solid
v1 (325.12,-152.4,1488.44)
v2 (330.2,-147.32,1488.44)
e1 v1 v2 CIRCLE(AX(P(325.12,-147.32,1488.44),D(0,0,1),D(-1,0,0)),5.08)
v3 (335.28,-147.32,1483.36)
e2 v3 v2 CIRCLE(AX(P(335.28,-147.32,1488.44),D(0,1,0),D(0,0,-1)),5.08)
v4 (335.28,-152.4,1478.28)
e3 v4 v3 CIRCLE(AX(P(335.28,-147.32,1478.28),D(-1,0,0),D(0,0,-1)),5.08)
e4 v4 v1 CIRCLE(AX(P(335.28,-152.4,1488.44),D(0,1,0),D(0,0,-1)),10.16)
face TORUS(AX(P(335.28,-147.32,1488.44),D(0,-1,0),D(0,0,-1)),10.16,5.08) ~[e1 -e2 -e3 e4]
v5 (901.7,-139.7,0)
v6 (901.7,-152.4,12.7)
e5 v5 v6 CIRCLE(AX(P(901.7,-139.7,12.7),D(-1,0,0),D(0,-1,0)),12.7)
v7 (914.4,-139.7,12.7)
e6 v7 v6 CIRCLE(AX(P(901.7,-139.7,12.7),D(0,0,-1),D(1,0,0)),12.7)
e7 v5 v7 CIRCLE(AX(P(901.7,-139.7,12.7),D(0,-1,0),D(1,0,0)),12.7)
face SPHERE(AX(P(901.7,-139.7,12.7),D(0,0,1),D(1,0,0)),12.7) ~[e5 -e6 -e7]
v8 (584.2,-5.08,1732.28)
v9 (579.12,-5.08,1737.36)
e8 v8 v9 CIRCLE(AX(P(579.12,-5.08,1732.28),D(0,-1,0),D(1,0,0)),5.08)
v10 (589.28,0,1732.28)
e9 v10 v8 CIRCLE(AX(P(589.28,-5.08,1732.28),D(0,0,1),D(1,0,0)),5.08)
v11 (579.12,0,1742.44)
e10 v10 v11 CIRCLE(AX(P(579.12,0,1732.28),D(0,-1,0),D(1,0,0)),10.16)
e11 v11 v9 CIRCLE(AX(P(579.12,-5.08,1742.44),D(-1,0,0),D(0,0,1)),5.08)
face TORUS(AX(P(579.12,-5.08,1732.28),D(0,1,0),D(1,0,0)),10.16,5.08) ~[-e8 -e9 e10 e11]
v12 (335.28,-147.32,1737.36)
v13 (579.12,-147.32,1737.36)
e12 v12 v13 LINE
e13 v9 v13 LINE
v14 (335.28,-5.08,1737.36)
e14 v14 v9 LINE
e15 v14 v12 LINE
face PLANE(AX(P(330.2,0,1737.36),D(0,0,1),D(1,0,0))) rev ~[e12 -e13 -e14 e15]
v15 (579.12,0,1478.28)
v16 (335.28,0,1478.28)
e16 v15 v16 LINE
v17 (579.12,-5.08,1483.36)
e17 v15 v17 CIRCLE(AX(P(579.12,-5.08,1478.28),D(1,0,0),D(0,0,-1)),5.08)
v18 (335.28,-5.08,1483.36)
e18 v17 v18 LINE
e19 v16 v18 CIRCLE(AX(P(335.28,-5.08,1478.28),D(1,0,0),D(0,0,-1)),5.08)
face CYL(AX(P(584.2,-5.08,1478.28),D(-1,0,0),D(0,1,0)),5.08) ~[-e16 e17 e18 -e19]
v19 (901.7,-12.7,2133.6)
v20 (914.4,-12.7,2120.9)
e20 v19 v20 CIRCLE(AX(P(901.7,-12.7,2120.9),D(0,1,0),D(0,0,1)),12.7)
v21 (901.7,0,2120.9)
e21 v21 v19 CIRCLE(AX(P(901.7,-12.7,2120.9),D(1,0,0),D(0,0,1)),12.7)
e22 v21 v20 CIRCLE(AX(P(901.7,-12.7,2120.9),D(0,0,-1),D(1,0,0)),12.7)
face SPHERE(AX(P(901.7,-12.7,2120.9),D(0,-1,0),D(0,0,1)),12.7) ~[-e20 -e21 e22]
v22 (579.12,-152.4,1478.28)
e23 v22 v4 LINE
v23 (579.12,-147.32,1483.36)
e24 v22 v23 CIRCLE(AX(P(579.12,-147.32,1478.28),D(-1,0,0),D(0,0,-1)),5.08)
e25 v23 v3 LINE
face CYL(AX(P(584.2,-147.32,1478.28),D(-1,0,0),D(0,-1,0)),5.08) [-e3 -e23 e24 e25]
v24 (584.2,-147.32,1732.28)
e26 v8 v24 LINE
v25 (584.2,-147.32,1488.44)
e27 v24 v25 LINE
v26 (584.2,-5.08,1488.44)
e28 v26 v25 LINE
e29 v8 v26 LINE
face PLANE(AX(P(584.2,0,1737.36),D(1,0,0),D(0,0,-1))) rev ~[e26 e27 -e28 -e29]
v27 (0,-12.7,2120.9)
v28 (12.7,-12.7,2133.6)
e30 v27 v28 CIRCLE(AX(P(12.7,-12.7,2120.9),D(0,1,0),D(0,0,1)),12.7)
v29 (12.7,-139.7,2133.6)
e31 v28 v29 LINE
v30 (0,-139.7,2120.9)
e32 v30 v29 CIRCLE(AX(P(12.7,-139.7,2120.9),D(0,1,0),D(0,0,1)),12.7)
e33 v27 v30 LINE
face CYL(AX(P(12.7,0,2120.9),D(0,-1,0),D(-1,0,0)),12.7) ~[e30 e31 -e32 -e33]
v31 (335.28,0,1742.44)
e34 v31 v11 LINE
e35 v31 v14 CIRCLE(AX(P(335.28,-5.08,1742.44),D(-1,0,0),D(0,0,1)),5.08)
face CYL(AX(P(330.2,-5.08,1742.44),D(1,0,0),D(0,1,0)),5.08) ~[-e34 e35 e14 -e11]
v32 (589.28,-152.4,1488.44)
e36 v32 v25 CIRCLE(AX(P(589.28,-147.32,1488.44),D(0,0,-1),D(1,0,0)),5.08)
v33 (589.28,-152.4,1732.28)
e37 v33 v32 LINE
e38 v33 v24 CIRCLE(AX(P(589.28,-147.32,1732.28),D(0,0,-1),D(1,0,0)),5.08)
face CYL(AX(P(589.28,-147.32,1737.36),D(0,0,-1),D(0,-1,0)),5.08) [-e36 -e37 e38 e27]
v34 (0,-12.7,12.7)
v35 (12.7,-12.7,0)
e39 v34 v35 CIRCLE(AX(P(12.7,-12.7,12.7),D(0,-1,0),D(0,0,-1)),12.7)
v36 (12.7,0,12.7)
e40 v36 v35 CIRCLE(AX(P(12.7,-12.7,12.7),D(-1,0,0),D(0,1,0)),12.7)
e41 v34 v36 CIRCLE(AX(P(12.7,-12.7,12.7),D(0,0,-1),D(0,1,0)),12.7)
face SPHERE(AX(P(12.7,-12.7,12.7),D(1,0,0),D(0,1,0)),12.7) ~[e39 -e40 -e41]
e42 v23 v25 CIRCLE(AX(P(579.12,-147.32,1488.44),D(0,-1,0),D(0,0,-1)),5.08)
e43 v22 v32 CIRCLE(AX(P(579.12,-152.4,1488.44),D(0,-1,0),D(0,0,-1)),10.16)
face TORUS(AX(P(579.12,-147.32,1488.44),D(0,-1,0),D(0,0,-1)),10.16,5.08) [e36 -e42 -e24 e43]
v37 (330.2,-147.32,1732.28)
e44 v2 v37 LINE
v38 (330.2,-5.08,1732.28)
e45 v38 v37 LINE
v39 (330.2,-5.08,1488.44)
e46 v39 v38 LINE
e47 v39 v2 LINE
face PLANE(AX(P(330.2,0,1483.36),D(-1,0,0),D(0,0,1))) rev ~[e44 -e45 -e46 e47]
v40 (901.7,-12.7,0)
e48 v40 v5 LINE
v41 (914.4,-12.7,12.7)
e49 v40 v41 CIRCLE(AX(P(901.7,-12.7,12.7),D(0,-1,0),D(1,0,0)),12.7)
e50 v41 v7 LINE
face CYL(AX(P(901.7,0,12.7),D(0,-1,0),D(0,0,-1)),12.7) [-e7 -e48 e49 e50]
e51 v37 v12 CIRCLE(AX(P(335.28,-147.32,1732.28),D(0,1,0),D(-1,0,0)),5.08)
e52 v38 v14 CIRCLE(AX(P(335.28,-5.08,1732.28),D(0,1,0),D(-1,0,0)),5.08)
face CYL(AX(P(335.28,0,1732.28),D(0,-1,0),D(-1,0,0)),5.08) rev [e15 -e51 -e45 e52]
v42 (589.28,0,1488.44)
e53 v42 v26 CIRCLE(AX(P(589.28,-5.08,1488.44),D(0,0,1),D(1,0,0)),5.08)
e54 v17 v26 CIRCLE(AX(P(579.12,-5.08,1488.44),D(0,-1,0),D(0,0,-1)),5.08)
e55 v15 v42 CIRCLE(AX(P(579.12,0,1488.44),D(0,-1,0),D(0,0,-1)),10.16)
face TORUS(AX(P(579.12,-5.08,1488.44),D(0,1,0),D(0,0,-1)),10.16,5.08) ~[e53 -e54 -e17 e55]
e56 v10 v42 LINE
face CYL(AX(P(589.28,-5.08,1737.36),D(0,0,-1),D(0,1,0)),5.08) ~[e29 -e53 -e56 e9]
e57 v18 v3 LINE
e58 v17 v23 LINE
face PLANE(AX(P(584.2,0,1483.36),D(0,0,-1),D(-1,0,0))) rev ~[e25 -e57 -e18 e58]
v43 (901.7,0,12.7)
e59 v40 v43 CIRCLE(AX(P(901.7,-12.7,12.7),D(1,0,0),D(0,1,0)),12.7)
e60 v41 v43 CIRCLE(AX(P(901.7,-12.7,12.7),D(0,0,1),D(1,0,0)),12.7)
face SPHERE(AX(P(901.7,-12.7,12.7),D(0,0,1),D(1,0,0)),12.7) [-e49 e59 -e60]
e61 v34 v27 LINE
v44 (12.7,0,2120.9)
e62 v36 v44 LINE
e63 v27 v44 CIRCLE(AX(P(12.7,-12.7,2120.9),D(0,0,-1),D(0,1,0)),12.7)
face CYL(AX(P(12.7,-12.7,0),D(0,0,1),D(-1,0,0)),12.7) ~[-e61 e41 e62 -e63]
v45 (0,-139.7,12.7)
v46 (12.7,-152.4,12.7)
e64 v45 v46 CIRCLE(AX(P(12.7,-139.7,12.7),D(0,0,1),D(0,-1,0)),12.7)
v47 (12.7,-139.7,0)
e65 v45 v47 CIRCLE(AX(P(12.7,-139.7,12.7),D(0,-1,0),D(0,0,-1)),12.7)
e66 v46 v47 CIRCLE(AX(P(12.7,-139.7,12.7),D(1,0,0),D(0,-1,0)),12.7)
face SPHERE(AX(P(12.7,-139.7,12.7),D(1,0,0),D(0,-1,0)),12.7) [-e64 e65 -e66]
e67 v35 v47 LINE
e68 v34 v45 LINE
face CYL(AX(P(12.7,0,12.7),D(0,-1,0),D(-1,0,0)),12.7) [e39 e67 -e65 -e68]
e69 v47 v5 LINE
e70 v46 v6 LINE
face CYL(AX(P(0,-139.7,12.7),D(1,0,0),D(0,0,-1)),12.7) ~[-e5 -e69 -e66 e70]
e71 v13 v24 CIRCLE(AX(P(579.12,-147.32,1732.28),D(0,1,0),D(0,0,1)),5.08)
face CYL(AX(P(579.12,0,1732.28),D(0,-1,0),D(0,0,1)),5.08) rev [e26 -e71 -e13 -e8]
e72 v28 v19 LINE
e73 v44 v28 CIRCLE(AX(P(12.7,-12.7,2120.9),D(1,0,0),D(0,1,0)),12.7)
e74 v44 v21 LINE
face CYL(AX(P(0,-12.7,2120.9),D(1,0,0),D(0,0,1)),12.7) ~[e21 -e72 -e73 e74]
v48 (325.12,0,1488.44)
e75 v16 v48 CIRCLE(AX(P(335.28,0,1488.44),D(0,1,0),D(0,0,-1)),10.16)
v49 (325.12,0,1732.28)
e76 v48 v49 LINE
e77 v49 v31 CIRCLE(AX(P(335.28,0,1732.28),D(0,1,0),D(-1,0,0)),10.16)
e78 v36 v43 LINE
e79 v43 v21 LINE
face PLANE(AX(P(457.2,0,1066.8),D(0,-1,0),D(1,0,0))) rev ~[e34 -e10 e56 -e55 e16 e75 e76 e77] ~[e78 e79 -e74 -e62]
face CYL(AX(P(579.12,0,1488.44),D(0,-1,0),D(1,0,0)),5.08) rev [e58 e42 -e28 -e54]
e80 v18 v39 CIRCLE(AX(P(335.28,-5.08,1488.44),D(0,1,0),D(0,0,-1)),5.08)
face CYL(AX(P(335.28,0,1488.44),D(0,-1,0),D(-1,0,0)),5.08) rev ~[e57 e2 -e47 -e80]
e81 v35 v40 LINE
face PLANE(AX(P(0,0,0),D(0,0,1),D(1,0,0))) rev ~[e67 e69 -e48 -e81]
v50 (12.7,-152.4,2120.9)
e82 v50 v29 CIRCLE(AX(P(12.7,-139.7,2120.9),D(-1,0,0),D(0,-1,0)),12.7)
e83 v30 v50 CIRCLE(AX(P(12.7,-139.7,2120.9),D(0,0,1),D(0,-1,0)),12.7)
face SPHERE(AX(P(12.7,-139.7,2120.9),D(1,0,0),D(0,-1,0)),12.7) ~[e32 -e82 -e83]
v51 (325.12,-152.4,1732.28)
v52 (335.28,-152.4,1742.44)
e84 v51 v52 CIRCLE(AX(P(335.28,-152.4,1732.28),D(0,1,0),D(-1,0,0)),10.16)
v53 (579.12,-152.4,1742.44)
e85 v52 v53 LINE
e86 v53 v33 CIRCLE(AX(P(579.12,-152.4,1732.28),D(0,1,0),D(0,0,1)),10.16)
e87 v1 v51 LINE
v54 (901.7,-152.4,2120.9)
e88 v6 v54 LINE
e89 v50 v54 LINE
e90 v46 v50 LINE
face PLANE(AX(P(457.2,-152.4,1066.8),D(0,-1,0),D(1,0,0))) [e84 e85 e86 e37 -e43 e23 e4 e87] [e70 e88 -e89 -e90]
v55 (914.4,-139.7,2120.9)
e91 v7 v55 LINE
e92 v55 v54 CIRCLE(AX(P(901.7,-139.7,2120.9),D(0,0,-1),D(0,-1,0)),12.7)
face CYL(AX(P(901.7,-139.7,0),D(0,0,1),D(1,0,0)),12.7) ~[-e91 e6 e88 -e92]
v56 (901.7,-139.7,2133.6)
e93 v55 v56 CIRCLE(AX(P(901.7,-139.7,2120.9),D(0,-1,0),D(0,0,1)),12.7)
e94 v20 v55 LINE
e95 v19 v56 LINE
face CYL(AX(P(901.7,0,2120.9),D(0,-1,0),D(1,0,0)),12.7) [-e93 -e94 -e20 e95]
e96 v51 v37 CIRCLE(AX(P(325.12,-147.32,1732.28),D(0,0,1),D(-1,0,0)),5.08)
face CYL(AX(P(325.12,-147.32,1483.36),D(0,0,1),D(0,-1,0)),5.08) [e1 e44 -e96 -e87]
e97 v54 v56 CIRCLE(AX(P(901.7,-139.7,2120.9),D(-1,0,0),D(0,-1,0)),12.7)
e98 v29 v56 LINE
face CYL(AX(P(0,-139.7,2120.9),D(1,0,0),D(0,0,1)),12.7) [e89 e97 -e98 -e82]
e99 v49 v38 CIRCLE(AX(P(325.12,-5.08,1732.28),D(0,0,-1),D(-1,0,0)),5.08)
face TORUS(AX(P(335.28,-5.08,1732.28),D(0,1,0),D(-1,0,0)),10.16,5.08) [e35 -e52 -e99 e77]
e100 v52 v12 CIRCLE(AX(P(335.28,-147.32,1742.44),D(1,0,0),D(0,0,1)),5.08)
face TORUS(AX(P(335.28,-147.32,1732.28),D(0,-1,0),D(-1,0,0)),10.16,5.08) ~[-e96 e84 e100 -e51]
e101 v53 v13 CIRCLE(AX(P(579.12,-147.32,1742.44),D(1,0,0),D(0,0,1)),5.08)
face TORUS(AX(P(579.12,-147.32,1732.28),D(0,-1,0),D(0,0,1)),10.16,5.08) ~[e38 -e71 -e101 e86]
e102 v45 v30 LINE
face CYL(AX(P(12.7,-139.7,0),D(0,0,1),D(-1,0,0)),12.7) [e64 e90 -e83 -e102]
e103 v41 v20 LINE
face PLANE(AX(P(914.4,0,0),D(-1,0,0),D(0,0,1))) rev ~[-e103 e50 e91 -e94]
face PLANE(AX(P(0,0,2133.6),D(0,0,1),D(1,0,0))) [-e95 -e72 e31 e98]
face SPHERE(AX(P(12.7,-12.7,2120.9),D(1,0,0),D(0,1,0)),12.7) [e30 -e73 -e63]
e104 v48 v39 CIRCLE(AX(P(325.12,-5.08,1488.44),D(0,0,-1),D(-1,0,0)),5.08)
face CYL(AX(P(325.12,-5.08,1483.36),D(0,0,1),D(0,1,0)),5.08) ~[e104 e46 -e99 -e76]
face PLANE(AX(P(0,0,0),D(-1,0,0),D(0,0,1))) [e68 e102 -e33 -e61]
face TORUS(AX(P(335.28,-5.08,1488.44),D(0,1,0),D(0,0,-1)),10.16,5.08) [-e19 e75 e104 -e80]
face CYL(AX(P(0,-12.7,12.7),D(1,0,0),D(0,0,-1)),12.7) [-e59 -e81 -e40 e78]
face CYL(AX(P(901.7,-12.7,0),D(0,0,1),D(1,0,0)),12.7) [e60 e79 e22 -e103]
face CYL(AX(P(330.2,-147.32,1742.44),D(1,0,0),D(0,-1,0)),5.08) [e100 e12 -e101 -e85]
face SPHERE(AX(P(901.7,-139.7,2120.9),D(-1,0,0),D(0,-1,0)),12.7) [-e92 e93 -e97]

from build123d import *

# Parameters (mm, degrees)
F0_W     = 914.4
F0_H     = 2133.6
F1_DEPTH = 152.4
F2_R     = 12.7
F3_R     = 5.08


# Not quite as in the source:
# - a feature names something its author has since deleted; it is built from what else it names


with BuildPart() as f1:
    # F0 (on Front) → F1 (new body)
    with BuildSketch(Plane.XZ):
        with Locations((457.2, 1066.8)):
            Rectangle(F0_W, F0_H)
        Polygon((330.2, 1737.36), (457.2, 1737.36), (584.2, 1737.36), (584.2, 1483.36), (330.2, 1483.36), align=None, mode=Mode.SUBTRACT)
    extrude(amount=F1_DEPTH)

    # F2
    f2_edges = [f1.edges().sort_by_distance(p)[0] for p in [
        (457.2, -152.4, 2133.6),
        (914.4, -152.4, 1066.8),
        (914.4, -76.2, 2133.6),
        (457.2, 0, 2133.6),
        (914.4, 0, 1066.8),
        (914.4, -76.2, 0),
        (457.2, -152.4, 0),
        (0, -152.4, 1066.8),
        (457.2, 0, 0),
        (0, 0, 1066.8),
        (0, -76.2, 0),
        (0, -76.2, 2133.6),
    ]]
    fillet(f2_edges, radius=F2_R)

    # F3
    f3_edges = [f1.edges().sort_by_distance(p)[0] for p in [
        (457.2, -152.4, 1483.36),
        (330.2, -152.4, 1610.36),
        (457.2, -152.4, 1737.36),
        (457.2, 0, 1483.36),
        (330.2, 0, 1610.36),
        (584.2, 0, 1610.36),
        (457.2, 0, 1737.36),
        (584.2, -152.4, 1610.36),
        (584.2, -76.2, 1483.36),
        (330.2, -76.2, 1483.36),
        (330.2, -76.2, 1737.36),
        (584.2, -76.2, 1737.36),
    ]]
    fillet(f3_edges, radius=F3_R)


solid = f1.part
